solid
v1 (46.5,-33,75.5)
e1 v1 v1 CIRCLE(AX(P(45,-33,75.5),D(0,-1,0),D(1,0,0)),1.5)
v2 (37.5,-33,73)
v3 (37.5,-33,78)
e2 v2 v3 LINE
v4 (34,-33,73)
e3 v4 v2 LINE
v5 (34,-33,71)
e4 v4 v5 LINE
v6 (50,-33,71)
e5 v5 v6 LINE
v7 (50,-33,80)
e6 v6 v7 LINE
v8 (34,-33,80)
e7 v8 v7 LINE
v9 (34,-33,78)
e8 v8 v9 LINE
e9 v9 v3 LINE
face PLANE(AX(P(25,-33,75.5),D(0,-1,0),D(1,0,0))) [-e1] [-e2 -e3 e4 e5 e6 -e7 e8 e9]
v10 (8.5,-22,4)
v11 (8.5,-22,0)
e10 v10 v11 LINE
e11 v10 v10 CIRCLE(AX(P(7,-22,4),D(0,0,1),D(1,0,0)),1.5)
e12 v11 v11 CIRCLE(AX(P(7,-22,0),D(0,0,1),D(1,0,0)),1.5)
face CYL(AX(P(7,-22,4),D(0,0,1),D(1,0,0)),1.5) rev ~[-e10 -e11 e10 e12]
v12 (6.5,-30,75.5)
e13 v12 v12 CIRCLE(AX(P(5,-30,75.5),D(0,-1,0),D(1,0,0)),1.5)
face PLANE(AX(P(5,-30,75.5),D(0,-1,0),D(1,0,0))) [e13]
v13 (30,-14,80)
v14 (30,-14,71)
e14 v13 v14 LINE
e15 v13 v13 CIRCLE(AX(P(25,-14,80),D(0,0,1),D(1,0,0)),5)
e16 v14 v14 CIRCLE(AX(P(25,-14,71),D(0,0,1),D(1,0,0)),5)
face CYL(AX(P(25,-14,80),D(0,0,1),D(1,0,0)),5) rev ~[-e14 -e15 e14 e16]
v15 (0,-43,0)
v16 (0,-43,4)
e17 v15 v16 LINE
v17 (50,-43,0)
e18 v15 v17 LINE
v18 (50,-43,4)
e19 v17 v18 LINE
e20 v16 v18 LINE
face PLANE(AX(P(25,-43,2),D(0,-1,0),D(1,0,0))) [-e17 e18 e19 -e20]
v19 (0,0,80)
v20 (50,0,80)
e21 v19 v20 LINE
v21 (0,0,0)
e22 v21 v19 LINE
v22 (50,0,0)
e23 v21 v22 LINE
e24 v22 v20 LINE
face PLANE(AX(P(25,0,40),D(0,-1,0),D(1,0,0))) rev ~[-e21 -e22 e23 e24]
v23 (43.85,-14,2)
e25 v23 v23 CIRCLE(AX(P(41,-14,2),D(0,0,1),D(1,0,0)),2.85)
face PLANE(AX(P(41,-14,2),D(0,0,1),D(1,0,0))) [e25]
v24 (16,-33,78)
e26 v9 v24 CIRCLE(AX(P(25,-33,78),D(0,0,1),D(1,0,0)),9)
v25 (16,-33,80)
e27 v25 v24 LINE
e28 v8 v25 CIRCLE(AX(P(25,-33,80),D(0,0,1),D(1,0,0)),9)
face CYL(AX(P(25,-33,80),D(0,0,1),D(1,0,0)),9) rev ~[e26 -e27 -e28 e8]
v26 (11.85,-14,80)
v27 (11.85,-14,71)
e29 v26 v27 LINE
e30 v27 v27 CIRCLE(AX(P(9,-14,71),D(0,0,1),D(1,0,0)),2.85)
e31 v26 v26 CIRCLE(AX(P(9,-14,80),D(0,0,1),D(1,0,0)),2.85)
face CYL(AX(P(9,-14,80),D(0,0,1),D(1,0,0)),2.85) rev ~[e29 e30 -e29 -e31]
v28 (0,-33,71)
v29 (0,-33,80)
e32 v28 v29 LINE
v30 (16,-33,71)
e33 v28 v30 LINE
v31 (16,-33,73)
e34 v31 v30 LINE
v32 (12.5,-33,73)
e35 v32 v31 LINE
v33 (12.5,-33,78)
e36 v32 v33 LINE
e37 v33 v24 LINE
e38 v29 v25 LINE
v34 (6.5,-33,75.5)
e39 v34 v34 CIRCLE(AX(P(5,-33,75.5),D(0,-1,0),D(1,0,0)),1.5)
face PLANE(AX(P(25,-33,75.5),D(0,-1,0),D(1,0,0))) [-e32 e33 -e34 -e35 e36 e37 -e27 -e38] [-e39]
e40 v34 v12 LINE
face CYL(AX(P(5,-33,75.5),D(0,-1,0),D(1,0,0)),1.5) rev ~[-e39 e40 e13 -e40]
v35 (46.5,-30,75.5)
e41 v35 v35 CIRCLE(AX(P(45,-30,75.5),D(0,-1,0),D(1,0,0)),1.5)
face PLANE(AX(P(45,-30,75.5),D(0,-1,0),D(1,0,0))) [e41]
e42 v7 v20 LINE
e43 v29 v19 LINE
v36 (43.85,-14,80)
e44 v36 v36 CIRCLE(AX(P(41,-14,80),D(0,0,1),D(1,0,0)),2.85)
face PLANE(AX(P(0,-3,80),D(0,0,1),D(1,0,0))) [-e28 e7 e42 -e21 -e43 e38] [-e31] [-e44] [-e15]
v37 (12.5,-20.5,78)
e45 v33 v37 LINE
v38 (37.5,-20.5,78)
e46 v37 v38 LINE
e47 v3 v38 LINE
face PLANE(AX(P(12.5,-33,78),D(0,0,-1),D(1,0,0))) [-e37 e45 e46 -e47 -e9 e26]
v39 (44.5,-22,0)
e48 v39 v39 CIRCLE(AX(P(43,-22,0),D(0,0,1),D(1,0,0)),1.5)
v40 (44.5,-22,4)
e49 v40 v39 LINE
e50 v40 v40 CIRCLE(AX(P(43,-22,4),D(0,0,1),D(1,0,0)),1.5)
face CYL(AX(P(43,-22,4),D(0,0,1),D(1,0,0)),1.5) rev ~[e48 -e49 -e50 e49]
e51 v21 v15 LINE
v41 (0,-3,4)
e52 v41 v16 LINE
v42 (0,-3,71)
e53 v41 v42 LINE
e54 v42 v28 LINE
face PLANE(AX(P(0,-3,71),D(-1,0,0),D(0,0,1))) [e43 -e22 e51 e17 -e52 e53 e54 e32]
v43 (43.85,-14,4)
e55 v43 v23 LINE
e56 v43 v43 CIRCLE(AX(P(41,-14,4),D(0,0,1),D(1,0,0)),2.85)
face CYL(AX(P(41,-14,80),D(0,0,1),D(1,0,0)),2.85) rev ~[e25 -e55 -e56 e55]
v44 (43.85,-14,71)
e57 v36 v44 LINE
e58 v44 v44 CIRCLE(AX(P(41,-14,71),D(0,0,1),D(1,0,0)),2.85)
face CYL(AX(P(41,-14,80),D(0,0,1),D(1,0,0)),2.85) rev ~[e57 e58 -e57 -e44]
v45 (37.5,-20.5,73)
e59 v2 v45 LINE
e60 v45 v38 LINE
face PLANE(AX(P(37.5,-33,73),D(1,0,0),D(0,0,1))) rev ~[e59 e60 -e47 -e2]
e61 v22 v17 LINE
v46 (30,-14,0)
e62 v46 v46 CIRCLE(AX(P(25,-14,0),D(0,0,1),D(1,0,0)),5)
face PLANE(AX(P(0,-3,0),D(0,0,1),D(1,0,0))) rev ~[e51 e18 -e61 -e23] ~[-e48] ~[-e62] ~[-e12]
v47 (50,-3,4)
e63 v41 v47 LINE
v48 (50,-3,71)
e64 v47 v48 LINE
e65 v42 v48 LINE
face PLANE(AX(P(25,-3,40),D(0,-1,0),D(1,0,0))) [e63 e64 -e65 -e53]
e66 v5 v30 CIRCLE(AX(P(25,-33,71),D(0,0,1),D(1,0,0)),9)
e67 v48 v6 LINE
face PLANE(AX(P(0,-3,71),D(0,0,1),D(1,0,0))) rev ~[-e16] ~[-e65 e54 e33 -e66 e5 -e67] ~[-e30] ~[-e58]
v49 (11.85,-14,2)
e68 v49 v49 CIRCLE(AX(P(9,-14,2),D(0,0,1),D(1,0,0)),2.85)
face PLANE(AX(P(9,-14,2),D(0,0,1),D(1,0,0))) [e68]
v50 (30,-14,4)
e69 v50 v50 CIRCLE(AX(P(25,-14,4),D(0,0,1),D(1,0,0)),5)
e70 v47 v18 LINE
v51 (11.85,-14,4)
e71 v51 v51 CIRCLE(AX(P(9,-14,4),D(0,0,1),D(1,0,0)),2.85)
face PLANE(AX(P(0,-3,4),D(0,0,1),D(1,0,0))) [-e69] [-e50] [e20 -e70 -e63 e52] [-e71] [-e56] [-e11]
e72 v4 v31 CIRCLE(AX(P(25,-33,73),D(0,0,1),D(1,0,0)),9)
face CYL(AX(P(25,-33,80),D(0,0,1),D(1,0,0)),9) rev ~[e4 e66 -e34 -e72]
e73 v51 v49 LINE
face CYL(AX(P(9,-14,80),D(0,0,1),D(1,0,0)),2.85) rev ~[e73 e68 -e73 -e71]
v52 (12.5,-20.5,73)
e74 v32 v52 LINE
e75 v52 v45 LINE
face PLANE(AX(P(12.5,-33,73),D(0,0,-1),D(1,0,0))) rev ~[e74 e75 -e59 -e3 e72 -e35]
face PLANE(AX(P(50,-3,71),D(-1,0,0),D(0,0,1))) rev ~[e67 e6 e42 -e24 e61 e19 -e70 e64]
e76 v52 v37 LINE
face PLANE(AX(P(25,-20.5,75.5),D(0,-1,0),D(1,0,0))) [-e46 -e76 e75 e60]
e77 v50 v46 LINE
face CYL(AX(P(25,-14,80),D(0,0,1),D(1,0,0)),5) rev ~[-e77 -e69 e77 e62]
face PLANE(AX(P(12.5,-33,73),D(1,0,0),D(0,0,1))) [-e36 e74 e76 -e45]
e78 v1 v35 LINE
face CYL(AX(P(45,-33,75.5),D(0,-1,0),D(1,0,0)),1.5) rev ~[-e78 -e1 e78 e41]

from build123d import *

# Parameters (mm, degrees)
F0_W      = 50
F0_H      = 80
F1_DEPTH  = 3
F2_W      = 50
F2_H      = 4
F3_DEPTH  = 40
F2_H_2    = 9
F4_DEPTH  = 30
F5_W      = 25
F5_H      = 5
F6_DEPTH  = 12.5
F8_DEPTH  = 9
F9_R      = 1.5
F10_DEPTH = 3
F7_R      = 2.85
F11_DEPTH = 78
F7_R_2    = 5
F12_DEPTH = 80
F13_R     = 1.5
F14_DEPTH = 4


with BuildPart() as f1:
    # F0 (on Front) → F1 (new body)
    with BuildSketch(Plane.XZ):
        with Locations((25, 40)):
            Rectangle(F0_W, F0_H)
    extrude(amount=F1_DEPTH)

    # F2 (on face) → F3 (join)
    with BuildSketch(Plane.XZ.offset(3)):
        with Locations((25, 2)):
            Rectangle(F2_W, F2_H)
    extrude(amount=F3_DEPTH)

    # F2 (on face) → F4 (join)
    with BuildSketch(Plane.XZ.offset(3)):
        with Locations((25, 75.5)):
            Rectangle(F2_W, F2_H_2)
    extrude(amount=F4_DEPTH)

    # F5 (on face) → F6 (cut)
    with BuildSketch(Plane.XZ.offset(33)):
        with Locations((25, 75.5)):
            Rectangle(F5_W, F5_H)
    extrude(amount=-F6_DEPTH, mode=Mode.SUBTRACT)

    # F7 (on face) → F8 (cut)
    with BuildSketch(Plane.XY.offset(80)):
        with BuildLine():
            Line((16, -33), (34, -33))
            ThreePointArc((34, -33), (25, -24), (16, -33))
        make_face()
    extrude(amount=-F8_DEPTH, mode=Mode.SUBTRACT)

    # F9 (on face) → F10 (cut)
    with BuildSketch(Plane.XZ.offset(33)):
        with Locations((5, 75.5)):
            Circle(F9_R)
        with Locations((45, 75.5)):
            Circle(F9_R)
    extrude(amount=-F10_DEPTH, mode=Mode.SUBTRACT)

    # F7 (on face) → F11 (cut)
    with BuildSketch(Plane.XY.offset(80)):
        with Locations((9, -14)):
            Circle(F7_R)
        with Locations((41, -14)):
            Circle(F7_R)
    extrude(amount=-F11_DEPTH, mode=Mode.SUBTRACT)

    # F7 (on face) → F12 (cut)
    with BuildSketch(Plane.XY.offset(80)):
        with Locations((25, -14)):
            Circle(F7_R_2)
    extrude(amount=-F12_DEPTH, mode=Mode.SUBTRACT)

    # F13 (on face) → F14 (cut)
    with BuildSketch(Plane.XY.offset(4)):
        with Locations((7, -22)):
            Circle(F13_R)
        with Locations((43, -22)):
            Circle(F13_R)
    extrude(amount=-F14_DEPTH, mode=Mode.SUBTRACT)


solid = f1.part
